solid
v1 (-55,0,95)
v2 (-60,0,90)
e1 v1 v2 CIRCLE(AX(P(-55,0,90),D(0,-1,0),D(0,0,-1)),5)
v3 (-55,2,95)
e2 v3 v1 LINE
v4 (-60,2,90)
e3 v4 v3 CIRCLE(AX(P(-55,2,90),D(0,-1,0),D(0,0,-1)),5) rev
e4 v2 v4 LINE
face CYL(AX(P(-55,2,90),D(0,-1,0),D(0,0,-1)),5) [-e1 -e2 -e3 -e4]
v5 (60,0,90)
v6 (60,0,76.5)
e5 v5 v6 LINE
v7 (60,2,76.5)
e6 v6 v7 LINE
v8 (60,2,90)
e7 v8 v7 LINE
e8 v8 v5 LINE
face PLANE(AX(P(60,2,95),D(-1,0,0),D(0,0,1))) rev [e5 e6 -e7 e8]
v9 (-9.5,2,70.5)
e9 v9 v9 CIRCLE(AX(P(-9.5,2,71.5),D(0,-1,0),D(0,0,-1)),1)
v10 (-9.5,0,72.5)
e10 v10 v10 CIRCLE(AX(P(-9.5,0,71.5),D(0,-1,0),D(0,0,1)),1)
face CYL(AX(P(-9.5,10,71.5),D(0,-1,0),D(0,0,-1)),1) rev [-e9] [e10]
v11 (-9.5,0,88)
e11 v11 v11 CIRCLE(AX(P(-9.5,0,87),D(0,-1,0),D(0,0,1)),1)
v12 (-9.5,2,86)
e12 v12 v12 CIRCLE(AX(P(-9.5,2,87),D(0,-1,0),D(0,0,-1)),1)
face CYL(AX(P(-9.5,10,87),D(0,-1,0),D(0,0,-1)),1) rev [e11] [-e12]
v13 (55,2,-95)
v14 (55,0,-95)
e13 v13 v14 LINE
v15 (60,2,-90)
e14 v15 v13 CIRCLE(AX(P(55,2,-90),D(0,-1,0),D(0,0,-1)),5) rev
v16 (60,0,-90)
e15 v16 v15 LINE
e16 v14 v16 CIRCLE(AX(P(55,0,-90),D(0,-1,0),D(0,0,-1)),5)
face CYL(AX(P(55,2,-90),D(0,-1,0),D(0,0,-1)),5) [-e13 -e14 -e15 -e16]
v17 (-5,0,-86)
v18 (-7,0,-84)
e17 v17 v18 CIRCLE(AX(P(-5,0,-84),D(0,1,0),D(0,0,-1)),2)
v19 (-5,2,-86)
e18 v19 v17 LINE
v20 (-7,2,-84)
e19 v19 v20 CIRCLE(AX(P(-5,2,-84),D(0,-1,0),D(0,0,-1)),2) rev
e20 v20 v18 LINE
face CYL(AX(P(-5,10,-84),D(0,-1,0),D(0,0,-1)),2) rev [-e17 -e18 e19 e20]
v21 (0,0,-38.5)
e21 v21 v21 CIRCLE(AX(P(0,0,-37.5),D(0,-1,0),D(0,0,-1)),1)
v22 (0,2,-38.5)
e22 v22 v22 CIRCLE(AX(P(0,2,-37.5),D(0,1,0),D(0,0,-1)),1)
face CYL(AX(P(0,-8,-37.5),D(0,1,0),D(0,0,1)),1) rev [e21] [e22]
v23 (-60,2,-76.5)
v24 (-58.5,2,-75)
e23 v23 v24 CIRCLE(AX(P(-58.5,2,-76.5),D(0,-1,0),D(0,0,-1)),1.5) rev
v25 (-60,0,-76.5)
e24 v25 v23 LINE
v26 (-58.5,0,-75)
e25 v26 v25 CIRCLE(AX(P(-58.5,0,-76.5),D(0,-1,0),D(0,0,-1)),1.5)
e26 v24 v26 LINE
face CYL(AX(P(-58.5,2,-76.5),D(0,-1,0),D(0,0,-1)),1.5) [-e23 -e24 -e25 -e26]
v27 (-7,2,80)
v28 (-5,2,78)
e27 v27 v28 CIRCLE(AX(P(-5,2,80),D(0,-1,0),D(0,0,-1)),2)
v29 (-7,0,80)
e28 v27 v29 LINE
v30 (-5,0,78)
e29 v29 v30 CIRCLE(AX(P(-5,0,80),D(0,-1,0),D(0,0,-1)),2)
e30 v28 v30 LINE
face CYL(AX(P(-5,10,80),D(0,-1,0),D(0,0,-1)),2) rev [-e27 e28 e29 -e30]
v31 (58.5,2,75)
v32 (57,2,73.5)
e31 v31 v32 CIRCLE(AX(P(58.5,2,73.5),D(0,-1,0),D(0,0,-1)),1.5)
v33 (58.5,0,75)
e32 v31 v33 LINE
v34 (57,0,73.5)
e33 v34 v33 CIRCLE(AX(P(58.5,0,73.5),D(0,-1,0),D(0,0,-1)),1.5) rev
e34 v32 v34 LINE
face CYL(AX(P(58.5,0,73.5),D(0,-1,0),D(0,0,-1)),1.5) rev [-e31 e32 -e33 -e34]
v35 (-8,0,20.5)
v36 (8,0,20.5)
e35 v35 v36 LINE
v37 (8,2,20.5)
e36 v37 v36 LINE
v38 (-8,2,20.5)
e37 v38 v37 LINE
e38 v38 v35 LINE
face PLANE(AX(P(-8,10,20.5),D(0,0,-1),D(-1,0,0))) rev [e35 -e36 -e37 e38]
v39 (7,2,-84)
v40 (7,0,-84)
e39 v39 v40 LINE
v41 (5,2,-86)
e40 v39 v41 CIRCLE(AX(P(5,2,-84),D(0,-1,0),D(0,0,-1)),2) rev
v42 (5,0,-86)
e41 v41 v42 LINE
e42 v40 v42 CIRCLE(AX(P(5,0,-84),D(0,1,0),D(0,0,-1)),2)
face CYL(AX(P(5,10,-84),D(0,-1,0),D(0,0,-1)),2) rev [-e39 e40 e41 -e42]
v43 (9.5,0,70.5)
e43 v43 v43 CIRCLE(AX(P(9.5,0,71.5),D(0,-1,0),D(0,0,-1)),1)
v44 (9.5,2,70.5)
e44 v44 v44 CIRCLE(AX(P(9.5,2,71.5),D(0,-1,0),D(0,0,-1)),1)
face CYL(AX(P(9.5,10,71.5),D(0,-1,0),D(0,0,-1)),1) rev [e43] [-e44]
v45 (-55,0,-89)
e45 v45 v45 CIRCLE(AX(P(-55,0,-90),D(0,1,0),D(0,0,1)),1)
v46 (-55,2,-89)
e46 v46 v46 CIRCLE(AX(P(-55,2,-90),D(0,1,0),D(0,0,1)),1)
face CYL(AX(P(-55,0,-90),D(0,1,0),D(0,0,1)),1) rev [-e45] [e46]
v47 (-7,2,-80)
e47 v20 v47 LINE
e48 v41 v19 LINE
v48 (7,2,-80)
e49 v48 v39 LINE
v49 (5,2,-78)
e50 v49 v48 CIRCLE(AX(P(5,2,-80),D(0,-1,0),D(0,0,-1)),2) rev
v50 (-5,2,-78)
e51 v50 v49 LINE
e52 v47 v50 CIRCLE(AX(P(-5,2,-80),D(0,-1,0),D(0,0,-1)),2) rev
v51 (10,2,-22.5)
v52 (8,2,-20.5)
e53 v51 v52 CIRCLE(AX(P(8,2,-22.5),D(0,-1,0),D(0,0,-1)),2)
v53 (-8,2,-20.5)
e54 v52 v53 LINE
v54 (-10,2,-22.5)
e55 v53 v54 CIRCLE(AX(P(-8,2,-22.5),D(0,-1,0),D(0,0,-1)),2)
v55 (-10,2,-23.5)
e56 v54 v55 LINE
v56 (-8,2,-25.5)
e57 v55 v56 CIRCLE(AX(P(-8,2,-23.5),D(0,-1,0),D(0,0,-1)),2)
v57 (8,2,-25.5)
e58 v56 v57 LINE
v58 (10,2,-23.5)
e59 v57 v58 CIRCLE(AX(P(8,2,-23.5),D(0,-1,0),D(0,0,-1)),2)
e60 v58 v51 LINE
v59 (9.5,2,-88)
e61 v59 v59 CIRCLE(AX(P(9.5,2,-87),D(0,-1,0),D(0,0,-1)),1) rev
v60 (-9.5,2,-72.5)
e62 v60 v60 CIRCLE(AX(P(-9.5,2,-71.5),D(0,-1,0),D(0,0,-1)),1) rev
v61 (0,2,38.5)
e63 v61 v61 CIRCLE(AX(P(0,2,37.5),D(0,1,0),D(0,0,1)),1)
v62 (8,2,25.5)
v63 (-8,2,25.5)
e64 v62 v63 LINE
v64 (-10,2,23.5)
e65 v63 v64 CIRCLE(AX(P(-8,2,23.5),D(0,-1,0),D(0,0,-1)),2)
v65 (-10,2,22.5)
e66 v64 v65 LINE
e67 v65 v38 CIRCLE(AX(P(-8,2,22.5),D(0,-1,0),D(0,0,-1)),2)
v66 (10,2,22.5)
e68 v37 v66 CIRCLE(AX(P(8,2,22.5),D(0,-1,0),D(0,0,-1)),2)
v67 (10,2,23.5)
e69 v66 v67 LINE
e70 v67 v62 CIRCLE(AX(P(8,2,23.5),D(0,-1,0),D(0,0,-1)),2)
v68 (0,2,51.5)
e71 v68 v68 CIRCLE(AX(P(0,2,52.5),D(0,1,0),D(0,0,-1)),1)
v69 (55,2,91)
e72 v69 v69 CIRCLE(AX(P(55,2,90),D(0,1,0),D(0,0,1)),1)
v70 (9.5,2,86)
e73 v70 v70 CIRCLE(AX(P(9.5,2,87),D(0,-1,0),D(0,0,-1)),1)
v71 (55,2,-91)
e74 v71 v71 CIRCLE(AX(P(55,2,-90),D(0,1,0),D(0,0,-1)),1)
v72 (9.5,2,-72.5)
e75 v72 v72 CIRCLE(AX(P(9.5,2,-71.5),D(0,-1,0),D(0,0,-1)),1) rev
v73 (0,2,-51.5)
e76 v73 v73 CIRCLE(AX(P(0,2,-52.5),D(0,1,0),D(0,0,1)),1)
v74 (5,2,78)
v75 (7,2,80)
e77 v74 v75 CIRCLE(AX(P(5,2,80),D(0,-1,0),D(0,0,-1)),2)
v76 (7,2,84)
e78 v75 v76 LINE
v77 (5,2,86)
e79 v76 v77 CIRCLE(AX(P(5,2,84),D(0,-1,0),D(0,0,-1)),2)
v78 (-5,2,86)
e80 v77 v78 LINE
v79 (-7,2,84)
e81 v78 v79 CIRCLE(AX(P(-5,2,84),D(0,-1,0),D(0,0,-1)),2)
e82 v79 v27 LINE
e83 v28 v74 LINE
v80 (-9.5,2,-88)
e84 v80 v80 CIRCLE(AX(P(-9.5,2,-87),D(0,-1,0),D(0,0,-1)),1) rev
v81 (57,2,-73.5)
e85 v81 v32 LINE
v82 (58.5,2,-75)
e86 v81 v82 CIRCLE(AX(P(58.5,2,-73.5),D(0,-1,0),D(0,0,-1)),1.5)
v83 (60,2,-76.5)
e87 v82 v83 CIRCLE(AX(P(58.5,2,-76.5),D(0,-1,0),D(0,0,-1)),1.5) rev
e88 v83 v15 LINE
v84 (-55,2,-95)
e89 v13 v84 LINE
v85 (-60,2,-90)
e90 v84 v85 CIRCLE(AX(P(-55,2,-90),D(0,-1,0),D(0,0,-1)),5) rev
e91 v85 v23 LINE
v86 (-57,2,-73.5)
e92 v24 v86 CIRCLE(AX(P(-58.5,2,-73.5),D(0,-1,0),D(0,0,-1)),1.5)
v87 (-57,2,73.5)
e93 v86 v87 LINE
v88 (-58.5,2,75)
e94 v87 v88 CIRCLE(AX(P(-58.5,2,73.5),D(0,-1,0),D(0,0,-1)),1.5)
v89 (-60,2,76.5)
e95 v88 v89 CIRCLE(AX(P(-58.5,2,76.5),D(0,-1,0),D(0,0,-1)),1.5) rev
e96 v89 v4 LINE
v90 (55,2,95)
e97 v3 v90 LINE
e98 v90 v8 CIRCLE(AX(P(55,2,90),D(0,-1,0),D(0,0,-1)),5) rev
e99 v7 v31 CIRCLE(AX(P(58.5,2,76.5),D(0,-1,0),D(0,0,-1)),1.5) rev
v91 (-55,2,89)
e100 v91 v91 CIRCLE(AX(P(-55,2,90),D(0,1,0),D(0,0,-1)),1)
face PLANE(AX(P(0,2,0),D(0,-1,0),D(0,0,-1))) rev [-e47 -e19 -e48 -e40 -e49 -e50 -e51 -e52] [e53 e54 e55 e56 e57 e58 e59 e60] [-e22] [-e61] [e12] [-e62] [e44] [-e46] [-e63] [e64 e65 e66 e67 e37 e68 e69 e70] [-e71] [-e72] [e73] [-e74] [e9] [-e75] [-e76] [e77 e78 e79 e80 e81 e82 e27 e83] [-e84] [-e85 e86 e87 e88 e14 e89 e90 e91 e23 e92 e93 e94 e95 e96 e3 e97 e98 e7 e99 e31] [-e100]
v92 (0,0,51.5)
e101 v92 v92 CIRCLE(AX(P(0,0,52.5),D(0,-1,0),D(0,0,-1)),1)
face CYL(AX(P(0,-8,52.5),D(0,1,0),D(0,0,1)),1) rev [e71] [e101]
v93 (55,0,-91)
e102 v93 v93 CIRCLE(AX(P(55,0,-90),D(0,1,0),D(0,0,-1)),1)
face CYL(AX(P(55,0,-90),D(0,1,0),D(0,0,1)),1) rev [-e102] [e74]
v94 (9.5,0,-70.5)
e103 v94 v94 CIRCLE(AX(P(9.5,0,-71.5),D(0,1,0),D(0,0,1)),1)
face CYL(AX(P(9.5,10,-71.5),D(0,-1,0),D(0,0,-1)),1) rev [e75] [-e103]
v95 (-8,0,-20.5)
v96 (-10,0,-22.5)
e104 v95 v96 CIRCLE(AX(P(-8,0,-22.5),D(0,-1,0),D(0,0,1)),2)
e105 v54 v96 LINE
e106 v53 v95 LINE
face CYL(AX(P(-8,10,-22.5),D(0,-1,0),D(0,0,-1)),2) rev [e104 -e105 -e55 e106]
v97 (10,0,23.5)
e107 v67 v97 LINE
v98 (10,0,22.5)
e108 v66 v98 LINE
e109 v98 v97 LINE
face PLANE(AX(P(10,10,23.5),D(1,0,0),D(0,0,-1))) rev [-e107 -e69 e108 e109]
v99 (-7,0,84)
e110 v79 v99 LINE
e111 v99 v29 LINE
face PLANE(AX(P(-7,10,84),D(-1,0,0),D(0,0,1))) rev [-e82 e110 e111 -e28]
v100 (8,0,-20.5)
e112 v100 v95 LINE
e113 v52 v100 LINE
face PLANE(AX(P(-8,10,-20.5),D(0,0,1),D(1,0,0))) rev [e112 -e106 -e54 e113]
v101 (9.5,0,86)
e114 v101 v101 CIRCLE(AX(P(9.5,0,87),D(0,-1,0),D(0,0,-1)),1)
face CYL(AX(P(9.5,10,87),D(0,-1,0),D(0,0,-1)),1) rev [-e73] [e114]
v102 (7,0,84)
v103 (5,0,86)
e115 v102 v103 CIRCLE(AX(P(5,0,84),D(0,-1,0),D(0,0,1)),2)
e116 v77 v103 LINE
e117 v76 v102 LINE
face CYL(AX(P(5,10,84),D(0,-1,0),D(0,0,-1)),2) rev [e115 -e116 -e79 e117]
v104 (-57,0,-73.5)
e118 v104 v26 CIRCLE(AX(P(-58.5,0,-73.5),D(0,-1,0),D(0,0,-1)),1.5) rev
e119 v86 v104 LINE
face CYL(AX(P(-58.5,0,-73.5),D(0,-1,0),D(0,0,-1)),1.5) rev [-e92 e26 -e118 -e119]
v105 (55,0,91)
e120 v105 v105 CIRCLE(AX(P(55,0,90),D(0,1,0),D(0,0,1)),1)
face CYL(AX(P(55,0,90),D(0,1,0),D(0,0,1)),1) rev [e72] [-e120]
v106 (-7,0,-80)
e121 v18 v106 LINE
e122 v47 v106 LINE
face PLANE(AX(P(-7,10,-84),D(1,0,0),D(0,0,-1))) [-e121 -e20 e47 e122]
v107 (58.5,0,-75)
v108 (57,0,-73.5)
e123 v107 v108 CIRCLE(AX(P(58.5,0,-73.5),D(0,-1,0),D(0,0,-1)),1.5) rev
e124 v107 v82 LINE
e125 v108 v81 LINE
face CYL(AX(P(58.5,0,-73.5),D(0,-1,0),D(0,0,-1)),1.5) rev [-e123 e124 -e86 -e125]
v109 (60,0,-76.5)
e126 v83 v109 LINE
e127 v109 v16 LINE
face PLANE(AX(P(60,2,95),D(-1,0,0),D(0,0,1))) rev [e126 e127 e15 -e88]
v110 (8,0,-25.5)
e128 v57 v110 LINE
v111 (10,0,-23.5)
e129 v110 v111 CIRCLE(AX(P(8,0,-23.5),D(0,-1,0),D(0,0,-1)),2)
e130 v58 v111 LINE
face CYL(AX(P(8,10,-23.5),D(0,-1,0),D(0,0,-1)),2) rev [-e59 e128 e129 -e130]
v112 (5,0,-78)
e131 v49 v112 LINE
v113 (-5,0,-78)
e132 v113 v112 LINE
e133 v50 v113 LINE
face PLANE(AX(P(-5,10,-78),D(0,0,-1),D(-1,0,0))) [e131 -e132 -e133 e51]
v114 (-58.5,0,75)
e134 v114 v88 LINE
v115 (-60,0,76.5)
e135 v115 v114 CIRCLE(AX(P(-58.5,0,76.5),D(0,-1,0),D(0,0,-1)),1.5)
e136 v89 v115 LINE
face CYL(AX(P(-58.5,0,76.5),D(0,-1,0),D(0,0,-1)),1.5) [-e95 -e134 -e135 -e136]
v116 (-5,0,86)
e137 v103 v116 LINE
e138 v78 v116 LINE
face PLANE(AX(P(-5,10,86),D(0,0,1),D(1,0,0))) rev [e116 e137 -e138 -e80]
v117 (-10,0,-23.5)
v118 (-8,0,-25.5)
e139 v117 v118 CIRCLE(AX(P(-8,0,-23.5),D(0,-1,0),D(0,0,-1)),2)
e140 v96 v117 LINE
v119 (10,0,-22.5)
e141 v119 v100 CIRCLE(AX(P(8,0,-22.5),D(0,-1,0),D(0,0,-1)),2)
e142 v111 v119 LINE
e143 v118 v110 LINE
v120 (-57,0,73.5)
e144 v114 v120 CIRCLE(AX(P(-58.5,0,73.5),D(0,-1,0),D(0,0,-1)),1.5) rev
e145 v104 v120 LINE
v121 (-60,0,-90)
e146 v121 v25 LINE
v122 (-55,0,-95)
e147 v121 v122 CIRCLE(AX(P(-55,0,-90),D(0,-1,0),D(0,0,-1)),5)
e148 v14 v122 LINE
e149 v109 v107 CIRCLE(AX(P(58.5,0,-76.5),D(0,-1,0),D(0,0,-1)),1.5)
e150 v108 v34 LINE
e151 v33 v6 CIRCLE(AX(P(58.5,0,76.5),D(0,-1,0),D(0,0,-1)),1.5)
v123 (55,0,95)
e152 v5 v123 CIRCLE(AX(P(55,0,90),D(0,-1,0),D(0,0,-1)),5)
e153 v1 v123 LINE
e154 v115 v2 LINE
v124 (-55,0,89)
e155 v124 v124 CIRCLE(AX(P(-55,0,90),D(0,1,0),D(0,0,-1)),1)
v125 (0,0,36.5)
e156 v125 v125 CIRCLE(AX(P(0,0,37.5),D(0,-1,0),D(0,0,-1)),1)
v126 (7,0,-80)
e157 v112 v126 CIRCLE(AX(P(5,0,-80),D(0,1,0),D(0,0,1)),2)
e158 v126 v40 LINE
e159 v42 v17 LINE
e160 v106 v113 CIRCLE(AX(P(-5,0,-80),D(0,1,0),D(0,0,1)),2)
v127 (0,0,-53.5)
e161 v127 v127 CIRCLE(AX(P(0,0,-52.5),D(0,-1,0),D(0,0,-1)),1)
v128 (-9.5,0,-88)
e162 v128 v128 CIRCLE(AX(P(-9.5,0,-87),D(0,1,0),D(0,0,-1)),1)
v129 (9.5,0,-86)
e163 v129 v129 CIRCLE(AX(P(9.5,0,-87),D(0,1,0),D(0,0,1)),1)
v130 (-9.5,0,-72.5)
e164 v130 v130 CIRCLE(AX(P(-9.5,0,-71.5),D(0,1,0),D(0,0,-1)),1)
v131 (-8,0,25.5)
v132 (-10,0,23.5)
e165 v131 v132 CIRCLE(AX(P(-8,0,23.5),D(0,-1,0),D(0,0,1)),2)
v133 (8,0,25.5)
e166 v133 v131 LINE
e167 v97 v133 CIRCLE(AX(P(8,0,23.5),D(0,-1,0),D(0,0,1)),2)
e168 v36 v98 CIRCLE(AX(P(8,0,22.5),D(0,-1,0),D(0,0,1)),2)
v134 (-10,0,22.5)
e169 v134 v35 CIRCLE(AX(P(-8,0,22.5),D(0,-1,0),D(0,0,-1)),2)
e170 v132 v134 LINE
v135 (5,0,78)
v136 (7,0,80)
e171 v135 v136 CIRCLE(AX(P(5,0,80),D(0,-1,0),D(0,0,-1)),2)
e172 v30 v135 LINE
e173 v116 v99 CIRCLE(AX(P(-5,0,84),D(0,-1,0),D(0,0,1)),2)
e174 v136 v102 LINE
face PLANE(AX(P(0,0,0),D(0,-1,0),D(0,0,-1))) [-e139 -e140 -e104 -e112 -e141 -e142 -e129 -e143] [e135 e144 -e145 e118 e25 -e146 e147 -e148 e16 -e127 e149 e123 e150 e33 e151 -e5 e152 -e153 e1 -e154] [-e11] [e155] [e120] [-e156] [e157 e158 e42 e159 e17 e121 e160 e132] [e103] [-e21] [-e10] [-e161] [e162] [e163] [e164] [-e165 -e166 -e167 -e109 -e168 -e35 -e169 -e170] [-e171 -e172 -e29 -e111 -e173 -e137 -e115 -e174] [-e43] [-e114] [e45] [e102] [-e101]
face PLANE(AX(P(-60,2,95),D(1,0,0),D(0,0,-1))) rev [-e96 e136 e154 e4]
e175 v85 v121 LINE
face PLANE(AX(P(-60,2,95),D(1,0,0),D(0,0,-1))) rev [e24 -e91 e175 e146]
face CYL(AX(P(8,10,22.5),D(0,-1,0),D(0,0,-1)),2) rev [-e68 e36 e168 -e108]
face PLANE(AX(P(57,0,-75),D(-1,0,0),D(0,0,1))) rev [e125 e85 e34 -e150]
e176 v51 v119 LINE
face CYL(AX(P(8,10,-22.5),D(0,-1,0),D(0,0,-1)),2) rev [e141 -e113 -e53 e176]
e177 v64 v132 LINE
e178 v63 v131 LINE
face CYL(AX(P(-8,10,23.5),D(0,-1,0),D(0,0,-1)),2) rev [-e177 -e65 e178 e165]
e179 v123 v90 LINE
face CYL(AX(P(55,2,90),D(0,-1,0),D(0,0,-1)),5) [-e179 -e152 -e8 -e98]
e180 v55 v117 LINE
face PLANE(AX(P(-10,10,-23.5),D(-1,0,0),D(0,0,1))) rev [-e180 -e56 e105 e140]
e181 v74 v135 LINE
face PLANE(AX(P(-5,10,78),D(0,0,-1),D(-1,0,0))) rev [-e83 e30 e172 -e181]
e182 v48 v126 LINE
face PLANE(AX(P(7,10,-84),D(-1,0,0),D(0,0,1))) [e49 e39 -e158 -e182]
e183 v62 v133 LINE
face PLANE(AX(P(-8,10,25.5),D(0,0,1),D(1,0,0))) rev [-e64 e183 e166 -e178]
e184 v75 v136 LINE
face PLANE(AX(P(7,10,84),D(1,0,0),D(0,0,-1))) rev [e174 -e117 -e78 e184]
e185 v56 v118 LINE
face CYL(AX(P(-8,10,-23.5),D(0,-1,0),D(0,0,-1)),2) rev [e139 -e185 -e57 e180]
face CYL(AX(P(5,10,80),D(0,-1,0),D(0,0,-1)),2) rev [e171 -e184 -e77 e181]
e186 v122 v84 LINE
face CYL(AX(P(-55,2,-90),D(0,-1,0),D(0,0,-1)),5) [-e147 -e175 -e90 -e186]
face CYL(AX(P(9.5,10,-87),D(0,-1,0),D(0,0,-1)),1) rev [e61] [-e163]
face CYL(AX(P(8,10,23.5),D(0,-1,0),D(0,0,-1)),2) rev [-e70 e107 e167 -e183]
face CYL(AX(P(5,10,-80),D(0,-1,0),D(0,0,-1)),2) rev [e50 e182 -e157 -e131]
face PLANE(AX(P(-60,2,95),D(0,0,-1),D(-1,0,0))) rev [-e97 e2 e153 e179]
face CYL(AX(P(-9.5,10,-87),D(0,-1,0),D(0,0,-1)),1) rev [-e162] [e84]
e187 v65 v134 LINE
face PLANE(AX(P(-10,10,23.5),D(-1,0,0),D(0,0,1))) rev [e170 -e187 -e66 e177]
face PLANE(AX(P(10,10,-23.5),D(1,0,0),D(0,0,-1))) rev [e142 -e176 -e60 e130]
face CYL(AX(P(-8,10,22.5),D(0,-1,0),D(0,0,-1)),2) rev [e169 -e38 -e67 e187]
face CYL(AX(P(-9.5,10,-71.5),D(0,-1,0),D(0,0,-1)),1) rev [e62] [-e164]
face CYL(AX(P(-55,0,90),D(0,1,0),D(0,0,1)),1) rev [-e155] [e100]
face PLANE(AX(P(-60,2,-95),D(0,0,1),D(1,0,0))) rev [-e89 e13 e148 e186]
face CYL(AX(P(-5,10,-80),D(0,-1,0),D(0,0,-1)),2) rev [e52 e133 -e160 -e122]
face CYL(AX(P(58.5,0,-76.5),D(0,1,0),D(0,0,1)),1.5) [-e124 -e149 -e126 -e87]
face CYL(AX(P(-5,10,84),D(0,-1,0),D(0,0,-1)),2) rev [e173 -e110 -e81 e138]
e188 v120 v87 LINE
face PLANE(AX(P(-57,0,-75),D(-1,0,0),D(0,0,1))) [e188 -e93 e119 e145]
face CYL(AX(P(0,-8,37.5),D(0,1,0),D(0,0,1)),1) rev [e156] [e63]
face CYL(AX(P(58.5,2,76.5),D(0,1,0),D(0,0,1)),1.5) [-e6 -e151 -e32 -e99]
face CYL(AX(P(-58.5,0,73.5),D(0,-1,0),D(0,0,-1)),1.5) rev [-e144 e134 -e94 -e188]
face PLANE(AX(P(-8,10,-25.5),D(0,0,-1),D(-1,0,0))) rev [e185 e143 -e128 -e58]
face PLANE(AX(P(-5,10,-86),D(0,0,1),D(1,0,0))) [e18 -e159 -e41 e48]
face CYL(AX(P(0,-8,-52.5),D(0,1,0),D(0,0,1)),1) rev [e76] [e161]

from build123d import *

# Parameters (mm, degrees)
ESBO_O1_W                = 120
ESBO_O1_H                = 190
RESSALTO_EXTRUS_O1_DEPTH = 2
ESBO_O2_R                = 1
CORTE_EXTRUS_O1_DEPTH    = 10
ESBO_O3_R                = 1
CORTE_EXTRUS_O2_DEPTH    = 113.378823628
FILETE1_R                = 5
ESBO_O4_W                = 3
ESBO_O4_H                = 150
CORTE_EXTRUS_O3_DEPTH    = 113.378823628
FILETE2_R                = 1.5
CORTE_EXTRUS_O4_DEPTH    = 10
ESBO_O6_R                = 1
CORTE_EXTRUS_O5_DEPTH    = 10


with BuildPart() as part:
    # Esboço1 → Ressalto-extrusão1 (new body)
    with BuildSketch(Plane(origin=(0, 0, 0), x_dir=(1, 0, 0), z_dir=(0, 1, 0))):
        Rectangle(ESBO_O1_W, ESBO_O1_H)
    extrude(amount=RESSALTO_EXTRUS_O1_DEPTH)

    # Esboço2 → Corte-extrusão1 (cut)
    with BuildSketch(Plane(origin=(0, 2, 0), x_dir=(1, 0, 0), z_dir=(0, 1, 0))):
        with Locations(Location((0, -37.5, 0), (0, 0, 270))):
            Circle(ESBO_O2_R)
        with Locations(Location((0, -52.5, 0), (0, 0, 90))):
            Circle(ESBO_O2_R)
        with Locations(Location((0, 52.5, 0), (0, 0, 270))):
            Circle(ESBO_O2_R)
        with Locations(Location((0, 37.5, 0), (0, 0, 90))):
            Circle(ESBO_O2_R)
    extrude(amount=-CORTE_EXTRUS_O1_DEPTH, mode=Mode.SUBTRACT)

    # Esboço3 → Corte-extrusão2 (cut, through all)
    with BuildSketch(Plane(origin=(0, 2, 0), x_dir=(1, 0, 0), z_dir=(0, 1, 0))):
        with Locations(Location((-55, 90, 0), (0, 0, 270))):
            Circle(ESBO_O3_R)
        with Locations(Location((55, 90, 0), (0, 0, 90))):
            Circle(ESBO_O3_R)
        with Locations(Location((55, -90, 0), (0, 0, 270))):
            Circle(ESBO_O3_R)
        with Locations(Location((-55, -90, 0), (0, 0, 90))):
            Circle(ESBO_O3_R)
    extrude(amount=-CORTE_EXTRUS_O2_DEPTH, mode=Mode.SUBTRACT)

    # Filete1
    filete1_edges = [part.edges().sort_by_distance(p)[0] for p in [
        (60, 1, 95),
        (-60, 1, 95),
        (-60, 1, -95),
        (60, 1, -95),
    ]]
    fillet(filete1_edges, radius=FILETE1_R)

    # Esboço4 → Corte-extrusão3 (cut, through all)
    with BuildSketch(Plane(origin=(0, 2, 0), x_dir=(1, 0, 0), z_dir=(0, 1, 0))):
        with Locations((58.5, 0)):
            Rectangle(ESBO_O4_W, ESBO_O4_H)
    corte_extrus_o3 = extrude(amount=-CORTE_EXTRUS_O3_DEPTH, mode=Mode.SUBTRACT)

    # Espelhar1: Corte-extrusão3 across plane
    add(corte_extrus_o3.mirror(Plane(origin=(0, 0, 0), x_dir=(0, 0, 1), z_dir=(1, 0, 0))), mode=Mode.SUBTRACT)

    # Filete2
    filete2_edges = [part.edges().sort_by_distance(p)[0] for p in [
        (57, 1, 75),
        (57, 1, -75),
        (-57, 1, 75),
        (-57, 1, -75),
    ]]
    fillet(filete2_edges, radius=FILETE2_R)
    filete2_2_edges = [part.edges().sort_by_distance(p)[0] for p in [
        (60, 1, 75),
        (60, 1, -75),
        (-60, 1, 75),
        (-60, 1, -75),
    ]]
    fillet(filete2_2_edges, radius=FILETE2_R - 0.0001)  # a hair under: the kernel refuses the full size

    # Esboço5 → Corte-extrusão4 (cut)
    with BuildSketch(Plane.XZ):
        with BuildLine():
            Line((-8, 25.5), (8, 25.5))
            ThreePointArc((8, 25.5), (9.414213562, 24.914213562), (10, 23.5))
            Line((10, 23.5), (10, 22.5))
            ThreePointArc((10, 22.5), (9.414213562, 21.085786438), (8, 20.5))
            Line((8, 20.5), (-8, 20.5))
            ThreePointArc((-8, 20.5), (-9.414213562, 21.085786438), (-10, 22.5))
            Line((-10, 22.5), (-10, 23.5))
            ThreePointArc((-10, 23.5), (-9.414213562, 24.914213562), (-8, 25.5))
        make_face()
        with BuildLine():
            Line((10, -23.5), (10, -22.5))
            ThreePointArc((10, -22.5), (9.414213562, -21.085786438), (8, -20.5))
            Line((8, -20.5), (-8, -20.5))
            ThreePointArc((-8, -20.5), (-9.414213562, -21.085786438), (-10, -22.5))
            Line((-10, -22.5), (-10, -23.5))
            ThreePointArc((-10, -23.5), (-9.414213562, -24.914213562), (-8, -25.5))
            Line((-8, -25.5), (8, -25.5))
            ThreePointArc((8, -25.5), (9.414213562, -24.914213562), (10, -23.5))
        make_face()
    extrude(amount=-CORTE_EXTRUS_O4_DEPTH, mode=Mode.SUBTRACT)

    # Esboço6 → Corte-extrusão5 (cut)
    with BuildSketch(Plane.XZ):
        with Locations(Location((9.5, 87, 0), (0, 0, 270))):
            Circle(ESBO_O6_R)
        with Locations(Location((9.5, 71.5, 0), (0, 0, 270))):
            Circle(ESBO_O6_R)
        with Locations(Location((-9.5, 87, 0), (0, 0, 270))):
            Circle(ESBO_O6_R)
        with Locations(Location((-9.5, 71.5, 0), (0, 0, 270))):
            Circle(ESBO_O6_R)
        with BuildLine():
            Line((-5, 86), (5, 86))
            ThreePointArc((5, 86), (6.414213562, 85.414213562), (7, 84))
            Line((7, 84), (7, 80))
            ThreePointArc((7, 80), (6.414213562, 78.585786438), (5, 78))
            Line((5, 78), (-5, 78))
            ThreePointArc((-5, 78), (-6.414213562, 78.585786438), (-7, 80))
            Line((-7, 80), (-7, 84))
            ThreePointArc((-7, 84), (-6.414213562, 85.414213562), (-5, 86))
        make_face()
    corte_extrus_o5 = extrude(amount=-CORTE_EXTRUS_O5_DEPTH, mode=Mode.SUBTRACT)

    # Espelhar2: Corte-extrusão5 across plane
    add(corte_extrus_o5.mirror(Plane.XY), mode=Mode.SUBTRACT)


solid = part.part
